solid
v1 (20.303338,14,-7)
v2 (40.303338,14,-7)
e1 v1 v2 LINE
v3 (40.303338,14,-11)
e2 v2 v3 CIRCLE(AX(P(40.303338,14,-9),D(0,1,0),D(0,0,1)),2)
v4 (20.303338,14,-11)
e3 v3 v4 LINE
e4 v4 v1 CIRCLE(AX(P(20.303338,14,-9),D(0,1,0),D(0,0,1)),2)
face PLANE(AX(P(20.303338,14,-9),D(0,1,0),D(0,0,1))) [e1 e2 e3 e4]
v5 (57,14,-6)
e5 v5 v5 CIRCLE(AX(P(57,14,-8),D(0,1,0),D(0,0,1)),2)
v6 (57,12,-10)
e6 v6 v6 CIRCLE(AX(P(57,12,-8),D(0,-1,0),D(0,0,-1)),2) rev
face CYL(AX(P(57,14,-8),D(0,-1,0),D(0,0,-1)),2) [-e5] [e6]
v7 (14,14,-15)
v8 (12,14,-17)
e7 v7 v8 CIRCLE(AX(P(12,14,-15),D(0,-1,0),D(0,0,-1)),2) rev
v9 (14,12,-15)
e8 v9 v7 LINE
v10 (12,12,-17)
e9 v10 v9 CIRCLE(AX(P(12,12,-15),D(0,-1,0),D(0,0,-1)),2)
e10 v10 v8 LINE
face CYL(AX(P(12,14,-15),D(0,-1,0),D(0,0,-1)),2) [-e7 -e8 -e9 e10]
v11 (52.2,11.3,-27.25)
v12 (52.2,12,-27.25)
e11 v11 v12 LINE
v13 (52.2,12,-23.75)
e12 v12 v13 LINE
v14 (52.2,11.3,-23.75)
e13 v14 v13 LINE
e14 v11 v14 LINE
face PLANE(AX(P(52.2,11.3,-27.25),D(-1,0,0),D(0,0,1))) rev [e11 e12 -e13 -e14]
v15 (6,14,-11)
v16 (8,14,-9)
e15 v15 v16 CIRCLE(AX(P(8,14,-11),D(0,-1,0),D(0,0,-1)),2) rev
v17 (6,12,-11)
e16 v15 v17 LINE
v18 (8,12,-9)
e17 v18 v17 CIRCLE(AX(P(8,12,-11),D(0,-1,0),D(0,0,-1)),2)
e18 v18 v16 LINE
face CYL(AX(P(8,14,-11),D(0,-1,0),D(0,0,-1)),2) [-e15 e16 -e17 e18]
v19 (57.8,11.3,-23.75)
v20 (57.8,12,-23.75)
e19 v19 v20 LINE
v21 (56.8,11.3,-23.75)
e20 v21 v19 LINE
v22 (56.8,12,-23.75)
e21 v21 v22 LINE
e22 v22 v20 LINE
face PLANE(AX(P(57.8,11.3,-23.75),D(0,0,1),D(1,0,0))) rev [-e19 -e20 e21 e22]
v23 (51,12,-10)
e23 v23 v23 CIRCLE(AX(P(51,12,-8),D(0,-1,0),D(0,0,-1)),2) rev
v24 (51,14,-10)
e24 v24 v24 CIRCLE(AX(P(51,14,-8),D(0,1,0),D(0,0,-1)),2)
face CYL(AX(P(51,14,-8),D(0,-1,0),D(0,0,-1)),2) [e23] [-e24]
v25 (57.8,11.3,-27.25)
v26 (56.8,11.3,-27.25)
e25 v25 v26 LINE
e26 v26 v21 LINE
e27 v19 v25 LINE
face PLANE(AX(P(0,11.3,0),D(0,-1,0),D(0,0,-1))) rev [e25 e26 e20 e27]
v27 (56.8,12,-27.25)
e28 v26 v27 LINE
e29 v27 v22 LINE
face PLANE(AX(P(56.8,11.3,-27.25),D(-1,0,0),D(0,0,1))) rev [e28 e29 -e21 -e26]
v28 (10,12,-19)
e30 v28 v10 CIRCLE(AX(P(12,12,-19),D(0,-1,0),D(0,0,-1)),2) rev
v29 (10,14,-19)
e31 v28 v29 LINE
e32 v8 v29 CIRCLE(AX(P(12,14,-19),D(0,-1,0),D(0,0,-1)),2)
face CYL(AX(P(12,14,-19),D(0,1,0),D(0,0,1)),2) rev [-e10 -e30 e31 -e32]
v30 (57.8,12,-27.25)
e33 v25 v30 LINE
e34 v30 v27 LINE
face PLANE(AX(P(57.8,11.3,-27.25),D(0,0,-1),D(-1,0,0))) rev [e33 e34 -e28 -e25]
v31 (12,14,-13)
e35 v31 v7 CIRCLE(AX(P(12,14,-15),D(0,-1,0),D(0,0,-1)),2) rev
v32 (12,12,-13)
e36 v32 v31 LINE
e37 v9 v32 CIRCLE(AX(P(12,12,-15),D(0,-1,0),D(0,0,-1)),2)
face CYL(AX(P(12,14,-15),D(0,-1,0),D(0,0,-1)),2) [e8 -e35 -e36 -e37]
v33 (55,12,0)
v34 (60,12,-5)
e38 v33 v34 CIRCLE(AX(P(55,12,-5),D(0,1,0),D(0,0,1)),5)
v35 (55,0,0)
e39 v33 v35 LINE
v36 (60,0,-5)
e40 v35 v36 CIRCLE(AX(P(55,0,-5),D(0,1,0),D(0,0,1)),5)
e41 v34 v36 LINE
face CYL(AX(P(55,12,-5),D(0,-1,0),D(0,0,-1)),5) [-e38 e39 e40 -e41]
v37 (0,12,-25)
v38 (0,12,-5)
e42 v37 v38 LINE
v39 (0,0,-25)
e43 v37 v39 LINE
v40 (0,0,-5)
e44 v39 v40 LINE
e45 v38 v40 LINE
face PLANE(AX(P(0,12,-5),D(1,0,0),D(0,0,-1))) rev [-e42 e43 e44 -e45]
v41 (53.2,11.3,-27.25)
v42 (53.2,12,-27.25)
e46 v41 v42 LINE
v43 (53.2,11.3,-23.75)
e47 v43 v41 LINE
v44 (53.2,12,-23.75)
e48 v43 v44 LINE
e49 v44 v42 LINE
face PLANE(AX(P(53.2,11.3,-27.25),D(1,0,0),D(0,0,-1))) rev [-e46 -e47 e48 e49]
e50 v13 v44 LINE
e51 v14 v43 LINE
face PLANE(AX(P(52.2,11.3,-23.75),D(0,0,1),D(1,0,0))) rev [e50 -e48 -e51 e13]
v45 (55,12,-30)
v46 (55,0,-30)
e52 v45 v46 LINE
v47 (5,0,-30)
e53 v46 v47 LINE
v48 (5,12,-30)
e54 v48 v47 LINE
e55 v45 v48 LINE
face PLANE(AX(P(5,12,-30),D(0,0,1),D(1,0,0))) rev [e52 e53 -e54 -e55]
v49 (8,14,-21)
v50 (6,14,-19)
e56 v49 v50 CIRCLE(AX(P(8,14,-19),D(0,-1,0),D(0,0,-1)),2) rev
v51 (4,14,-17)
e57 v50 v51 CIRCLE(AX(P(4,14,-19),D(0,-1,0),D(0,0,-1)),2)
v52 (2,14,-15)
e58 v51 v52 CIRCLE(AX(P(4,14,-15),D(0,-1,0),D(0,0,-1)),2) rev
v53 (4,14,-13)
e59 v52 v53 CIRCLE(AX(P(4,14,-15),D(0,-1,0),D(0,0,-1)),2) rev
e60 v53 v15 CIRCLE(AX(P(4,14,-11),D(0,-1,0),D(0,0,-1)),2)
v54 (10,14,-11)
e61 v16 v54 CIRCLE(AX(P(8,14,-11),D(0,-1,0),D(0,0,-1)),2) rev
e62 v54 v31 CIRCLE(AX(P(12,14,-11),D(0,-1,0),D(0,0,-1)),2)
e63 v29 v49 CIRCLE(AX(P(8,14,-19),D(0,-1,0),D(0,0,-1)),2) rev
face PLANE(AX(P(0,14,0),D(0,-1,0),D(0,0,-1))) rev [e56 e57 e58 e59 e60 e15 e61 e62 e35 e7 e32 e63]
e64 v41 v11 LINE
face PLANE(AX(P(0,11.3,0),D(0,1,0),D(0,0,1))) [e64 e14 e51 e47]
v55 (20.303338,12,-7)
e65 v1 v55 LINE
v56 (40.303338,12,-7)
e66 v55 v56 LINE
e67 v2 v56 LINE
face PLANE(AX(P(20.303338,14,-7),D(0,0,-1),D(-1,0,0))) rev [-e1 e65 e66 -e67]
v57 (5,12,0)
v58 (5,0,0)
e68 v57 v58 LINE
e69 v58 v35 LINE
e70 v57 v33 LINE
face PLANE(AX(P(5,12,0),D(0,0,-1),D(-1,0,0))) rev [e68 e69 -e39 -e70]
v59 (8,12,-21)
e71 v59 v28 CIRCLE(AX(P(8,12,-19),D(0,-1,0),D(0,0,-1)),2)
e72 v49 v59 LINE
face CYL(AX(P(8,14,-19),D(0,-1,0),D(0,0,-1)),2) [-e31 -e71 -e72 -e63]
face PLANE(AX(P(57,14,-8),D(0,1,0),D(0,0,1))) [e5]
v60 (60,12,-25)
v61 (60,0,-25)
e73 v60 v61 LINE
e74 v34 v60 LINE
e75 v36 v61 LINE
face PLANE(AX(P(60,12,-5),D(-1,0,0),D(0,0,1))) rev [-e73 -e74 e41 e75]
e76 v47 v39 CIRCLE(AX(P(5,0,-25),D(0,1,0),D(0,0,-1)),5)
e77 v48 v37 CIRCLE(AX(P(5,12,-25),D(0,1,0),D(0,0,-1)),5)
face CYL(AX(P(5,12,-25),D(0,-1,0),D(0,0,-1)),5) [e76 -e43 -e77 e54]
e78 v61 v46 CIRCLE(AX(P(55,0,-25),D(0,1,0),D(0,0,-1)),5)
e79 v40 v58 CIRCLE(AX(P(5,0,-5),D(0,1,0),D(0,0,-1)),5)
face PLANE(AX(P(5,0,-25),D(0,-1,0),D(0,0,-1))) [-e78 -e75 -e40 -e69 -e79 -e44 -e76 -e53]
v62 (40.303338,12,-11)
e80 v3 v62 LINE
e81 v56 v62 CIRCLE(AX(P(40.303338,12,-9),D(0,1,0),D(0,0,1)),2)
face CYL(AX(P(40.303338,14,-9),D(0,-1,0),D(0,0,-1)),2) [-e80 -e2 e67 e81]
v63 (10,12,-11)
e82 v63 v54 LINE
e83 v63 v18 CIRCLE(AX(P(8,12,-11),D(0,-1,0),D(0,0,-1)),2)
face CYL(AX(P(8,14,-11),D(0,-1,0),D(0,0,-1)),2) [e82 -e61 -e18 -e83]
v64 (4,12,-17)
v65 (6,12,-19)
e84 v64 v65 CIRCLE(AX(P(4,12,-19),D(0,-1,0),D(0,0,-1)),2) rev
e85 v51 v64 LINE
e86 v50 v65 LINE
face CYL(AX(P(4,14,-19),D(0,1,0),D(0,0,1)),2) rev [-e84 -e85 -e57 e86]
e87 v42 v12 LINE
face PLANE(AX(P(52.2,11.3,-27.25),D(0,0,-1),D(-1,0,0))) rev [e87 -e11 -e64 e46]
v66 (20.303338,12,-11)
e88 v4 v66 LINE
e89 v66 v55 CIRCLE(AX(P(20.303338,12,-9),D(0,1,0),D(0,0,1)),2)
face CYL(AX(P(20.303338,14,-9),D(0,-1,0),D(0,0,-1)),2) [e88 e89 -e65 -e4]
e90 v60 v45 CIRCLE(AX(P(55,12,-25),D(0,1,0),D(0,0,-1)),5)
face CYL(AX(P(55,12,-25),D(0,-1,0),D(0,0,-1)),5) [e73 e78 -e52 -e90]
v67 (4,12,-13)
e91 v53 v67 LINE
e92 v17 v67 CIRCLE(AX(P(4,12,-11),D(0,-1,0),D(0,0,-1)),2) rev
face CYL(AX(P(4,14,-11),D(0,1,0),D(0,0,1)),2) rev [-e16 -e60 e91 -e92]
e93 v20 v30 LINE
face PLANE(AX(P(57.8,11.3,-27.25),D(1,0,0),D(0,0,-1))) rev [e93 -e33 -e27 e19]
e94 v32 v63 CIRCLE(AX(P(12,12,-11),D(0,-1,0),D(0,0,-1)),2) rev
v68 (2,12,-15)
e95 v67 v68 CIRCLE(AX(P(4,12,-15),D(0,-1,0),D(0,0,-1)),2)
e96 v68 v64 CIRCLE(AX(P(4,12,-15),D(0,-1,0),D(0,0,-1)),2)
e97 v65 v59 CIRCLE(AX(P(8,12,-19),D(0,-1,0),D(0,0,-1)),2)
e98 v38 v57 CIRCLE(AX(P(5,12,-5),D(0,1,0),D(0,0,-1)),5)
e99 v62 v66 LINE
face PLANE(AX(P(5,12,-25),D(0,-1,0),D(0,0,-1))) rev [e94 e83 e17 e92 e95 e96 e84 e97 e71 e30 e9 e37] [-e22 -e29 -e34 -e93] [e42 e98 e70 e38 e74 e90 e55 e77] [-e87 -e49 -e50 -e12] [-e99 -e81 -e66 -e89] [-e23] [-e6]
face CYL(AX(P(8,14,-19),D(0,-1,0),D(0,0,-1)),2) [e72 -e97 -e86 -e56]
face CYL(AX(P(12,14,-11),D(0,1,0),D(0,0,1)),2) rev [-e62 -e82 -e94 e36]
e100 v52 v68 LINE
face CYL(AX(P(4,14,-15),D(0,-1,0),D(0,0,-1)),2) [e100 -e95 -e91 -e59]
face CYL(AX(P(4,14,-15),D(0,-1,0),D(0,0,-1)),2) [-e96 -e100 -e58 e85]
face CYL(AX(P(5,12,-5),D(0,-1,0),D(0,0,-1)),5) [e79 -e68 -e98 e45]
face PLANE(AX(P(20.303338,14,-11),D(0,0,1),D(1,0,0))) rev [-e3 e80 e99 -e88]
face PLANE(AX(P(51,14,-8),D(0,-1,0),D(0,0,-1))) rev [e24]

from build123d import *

# Parameters (mm, degrees)
BOSS_EXTRUDE1_DEPTH = 12
SKETCH2_R           = 2
BOSS_EXTRUDE2_DEPTH = 2
SKETCH3_W           = 1
SKETCH3_H           = 3.5
CUT_EXTRUDE1_DEPTH  = 0.7
FILLET2_R           = 2


with BuildPart() as part:
    # Sketch1 → Boss-Extrude1 (new body)
    with BuildSketch(Plane(origin=(0, 0, 0), x_dir=(1, 0, 0), z_dir=(0, 1, 0))):
        with BuildLine():
            Line((5, 0), (55, 0))
            ThreePointArc((55, 0), (58.535533906, 1.464466094), (60, 5))
            Line((60, 5), (60, 25))
            ThreePointArc((60, 25), (58.535533906, 28.535533906), (55, 30))
            Line((55, 30), (5, 30))
            ThreePointArc((5, 30), (1.464466094, 28.535533906), (0, 25))
            Line((0, 25), (0, 5))
            ThreePointArc((0, 5), (1.464466094, 1.464466094), (5, 0))
        make_face()
    extrude(amount=BOSS_EXTRUDE1_DEPTH)

    # Sketch2 → Boss-Extrude2 (add)
    with BuildSketch(Plane(origin=(0, 12, 0), x_dir=(1, 0, 0), z_dir=(0, 1, 0))):
        with Locations(Location((57, 8, 0), (0, 0, 90))):
            Circle(SKETCH2_R)
        with Locations(Location((51, 8, 0), (0, 0, 90))):
            Circle(SKETCH2_R)
        Polygon((2, 17), (2, 13), (6, 13), (6, 9), (10, 9), (10, 13), (14, 13), (14, 17), (10, 17), (10, 21), (6, 21), (6, 17), align=None)
        with BuildLine():
            Line((20.303338261, 11), (40.303338261, 11))
            ThreePointArc((40.303338261, 11), (42.303338261, 9), (40.303338261, 7))
            Line((40.303338261, 7), (20.303338261, 7))
            ThreePointArc((20.303338261, 7), (18.303338261, 9), (20.303338261, 11))
        make_face()
    extrude(amount=BOSS_EXTRUDE2_DEPTH)

    # Sketch3 → Cut-Extrude1 (cut)
    with BuildSketch(Plane(origin=(0, 12, 0), x_dir=(1, 0, 0), z_dir=(0, 1, 0))):
        with Locations((52.7, 25.5)):
            Rectangle(SKETCH3_W, SKETCH3_H)
        with Locations((57.3, 25.5)):
            Rectangle(SKETCH3_W, SKETCH3_H)
    extrude(amount=-CUT_EXTRUDE1_DEPTH, mode=Mode.SUBTRACT)

    # Fillet2
    fillet2_edges = [part.edges().sort_by_distance(p)[0] for p in [
        (6, 13, -9),
        (6, 13, -13),
        (2, 13, -13),
        (2, 13, -17),
        (6, 13, -17),
        (6, 13, -21),
        (10, 13, -21),
        (10, 13, -17),
        (14, 13, -17),
        (14, 13, -13),
        (10, 13, -13),
        (10, 13, -9),
    ]]
    fillet(fillet2_edges, radius=FILLET2_R - 0.0001)  # a hair under: the kernel refuses the full size


solid = part.part
